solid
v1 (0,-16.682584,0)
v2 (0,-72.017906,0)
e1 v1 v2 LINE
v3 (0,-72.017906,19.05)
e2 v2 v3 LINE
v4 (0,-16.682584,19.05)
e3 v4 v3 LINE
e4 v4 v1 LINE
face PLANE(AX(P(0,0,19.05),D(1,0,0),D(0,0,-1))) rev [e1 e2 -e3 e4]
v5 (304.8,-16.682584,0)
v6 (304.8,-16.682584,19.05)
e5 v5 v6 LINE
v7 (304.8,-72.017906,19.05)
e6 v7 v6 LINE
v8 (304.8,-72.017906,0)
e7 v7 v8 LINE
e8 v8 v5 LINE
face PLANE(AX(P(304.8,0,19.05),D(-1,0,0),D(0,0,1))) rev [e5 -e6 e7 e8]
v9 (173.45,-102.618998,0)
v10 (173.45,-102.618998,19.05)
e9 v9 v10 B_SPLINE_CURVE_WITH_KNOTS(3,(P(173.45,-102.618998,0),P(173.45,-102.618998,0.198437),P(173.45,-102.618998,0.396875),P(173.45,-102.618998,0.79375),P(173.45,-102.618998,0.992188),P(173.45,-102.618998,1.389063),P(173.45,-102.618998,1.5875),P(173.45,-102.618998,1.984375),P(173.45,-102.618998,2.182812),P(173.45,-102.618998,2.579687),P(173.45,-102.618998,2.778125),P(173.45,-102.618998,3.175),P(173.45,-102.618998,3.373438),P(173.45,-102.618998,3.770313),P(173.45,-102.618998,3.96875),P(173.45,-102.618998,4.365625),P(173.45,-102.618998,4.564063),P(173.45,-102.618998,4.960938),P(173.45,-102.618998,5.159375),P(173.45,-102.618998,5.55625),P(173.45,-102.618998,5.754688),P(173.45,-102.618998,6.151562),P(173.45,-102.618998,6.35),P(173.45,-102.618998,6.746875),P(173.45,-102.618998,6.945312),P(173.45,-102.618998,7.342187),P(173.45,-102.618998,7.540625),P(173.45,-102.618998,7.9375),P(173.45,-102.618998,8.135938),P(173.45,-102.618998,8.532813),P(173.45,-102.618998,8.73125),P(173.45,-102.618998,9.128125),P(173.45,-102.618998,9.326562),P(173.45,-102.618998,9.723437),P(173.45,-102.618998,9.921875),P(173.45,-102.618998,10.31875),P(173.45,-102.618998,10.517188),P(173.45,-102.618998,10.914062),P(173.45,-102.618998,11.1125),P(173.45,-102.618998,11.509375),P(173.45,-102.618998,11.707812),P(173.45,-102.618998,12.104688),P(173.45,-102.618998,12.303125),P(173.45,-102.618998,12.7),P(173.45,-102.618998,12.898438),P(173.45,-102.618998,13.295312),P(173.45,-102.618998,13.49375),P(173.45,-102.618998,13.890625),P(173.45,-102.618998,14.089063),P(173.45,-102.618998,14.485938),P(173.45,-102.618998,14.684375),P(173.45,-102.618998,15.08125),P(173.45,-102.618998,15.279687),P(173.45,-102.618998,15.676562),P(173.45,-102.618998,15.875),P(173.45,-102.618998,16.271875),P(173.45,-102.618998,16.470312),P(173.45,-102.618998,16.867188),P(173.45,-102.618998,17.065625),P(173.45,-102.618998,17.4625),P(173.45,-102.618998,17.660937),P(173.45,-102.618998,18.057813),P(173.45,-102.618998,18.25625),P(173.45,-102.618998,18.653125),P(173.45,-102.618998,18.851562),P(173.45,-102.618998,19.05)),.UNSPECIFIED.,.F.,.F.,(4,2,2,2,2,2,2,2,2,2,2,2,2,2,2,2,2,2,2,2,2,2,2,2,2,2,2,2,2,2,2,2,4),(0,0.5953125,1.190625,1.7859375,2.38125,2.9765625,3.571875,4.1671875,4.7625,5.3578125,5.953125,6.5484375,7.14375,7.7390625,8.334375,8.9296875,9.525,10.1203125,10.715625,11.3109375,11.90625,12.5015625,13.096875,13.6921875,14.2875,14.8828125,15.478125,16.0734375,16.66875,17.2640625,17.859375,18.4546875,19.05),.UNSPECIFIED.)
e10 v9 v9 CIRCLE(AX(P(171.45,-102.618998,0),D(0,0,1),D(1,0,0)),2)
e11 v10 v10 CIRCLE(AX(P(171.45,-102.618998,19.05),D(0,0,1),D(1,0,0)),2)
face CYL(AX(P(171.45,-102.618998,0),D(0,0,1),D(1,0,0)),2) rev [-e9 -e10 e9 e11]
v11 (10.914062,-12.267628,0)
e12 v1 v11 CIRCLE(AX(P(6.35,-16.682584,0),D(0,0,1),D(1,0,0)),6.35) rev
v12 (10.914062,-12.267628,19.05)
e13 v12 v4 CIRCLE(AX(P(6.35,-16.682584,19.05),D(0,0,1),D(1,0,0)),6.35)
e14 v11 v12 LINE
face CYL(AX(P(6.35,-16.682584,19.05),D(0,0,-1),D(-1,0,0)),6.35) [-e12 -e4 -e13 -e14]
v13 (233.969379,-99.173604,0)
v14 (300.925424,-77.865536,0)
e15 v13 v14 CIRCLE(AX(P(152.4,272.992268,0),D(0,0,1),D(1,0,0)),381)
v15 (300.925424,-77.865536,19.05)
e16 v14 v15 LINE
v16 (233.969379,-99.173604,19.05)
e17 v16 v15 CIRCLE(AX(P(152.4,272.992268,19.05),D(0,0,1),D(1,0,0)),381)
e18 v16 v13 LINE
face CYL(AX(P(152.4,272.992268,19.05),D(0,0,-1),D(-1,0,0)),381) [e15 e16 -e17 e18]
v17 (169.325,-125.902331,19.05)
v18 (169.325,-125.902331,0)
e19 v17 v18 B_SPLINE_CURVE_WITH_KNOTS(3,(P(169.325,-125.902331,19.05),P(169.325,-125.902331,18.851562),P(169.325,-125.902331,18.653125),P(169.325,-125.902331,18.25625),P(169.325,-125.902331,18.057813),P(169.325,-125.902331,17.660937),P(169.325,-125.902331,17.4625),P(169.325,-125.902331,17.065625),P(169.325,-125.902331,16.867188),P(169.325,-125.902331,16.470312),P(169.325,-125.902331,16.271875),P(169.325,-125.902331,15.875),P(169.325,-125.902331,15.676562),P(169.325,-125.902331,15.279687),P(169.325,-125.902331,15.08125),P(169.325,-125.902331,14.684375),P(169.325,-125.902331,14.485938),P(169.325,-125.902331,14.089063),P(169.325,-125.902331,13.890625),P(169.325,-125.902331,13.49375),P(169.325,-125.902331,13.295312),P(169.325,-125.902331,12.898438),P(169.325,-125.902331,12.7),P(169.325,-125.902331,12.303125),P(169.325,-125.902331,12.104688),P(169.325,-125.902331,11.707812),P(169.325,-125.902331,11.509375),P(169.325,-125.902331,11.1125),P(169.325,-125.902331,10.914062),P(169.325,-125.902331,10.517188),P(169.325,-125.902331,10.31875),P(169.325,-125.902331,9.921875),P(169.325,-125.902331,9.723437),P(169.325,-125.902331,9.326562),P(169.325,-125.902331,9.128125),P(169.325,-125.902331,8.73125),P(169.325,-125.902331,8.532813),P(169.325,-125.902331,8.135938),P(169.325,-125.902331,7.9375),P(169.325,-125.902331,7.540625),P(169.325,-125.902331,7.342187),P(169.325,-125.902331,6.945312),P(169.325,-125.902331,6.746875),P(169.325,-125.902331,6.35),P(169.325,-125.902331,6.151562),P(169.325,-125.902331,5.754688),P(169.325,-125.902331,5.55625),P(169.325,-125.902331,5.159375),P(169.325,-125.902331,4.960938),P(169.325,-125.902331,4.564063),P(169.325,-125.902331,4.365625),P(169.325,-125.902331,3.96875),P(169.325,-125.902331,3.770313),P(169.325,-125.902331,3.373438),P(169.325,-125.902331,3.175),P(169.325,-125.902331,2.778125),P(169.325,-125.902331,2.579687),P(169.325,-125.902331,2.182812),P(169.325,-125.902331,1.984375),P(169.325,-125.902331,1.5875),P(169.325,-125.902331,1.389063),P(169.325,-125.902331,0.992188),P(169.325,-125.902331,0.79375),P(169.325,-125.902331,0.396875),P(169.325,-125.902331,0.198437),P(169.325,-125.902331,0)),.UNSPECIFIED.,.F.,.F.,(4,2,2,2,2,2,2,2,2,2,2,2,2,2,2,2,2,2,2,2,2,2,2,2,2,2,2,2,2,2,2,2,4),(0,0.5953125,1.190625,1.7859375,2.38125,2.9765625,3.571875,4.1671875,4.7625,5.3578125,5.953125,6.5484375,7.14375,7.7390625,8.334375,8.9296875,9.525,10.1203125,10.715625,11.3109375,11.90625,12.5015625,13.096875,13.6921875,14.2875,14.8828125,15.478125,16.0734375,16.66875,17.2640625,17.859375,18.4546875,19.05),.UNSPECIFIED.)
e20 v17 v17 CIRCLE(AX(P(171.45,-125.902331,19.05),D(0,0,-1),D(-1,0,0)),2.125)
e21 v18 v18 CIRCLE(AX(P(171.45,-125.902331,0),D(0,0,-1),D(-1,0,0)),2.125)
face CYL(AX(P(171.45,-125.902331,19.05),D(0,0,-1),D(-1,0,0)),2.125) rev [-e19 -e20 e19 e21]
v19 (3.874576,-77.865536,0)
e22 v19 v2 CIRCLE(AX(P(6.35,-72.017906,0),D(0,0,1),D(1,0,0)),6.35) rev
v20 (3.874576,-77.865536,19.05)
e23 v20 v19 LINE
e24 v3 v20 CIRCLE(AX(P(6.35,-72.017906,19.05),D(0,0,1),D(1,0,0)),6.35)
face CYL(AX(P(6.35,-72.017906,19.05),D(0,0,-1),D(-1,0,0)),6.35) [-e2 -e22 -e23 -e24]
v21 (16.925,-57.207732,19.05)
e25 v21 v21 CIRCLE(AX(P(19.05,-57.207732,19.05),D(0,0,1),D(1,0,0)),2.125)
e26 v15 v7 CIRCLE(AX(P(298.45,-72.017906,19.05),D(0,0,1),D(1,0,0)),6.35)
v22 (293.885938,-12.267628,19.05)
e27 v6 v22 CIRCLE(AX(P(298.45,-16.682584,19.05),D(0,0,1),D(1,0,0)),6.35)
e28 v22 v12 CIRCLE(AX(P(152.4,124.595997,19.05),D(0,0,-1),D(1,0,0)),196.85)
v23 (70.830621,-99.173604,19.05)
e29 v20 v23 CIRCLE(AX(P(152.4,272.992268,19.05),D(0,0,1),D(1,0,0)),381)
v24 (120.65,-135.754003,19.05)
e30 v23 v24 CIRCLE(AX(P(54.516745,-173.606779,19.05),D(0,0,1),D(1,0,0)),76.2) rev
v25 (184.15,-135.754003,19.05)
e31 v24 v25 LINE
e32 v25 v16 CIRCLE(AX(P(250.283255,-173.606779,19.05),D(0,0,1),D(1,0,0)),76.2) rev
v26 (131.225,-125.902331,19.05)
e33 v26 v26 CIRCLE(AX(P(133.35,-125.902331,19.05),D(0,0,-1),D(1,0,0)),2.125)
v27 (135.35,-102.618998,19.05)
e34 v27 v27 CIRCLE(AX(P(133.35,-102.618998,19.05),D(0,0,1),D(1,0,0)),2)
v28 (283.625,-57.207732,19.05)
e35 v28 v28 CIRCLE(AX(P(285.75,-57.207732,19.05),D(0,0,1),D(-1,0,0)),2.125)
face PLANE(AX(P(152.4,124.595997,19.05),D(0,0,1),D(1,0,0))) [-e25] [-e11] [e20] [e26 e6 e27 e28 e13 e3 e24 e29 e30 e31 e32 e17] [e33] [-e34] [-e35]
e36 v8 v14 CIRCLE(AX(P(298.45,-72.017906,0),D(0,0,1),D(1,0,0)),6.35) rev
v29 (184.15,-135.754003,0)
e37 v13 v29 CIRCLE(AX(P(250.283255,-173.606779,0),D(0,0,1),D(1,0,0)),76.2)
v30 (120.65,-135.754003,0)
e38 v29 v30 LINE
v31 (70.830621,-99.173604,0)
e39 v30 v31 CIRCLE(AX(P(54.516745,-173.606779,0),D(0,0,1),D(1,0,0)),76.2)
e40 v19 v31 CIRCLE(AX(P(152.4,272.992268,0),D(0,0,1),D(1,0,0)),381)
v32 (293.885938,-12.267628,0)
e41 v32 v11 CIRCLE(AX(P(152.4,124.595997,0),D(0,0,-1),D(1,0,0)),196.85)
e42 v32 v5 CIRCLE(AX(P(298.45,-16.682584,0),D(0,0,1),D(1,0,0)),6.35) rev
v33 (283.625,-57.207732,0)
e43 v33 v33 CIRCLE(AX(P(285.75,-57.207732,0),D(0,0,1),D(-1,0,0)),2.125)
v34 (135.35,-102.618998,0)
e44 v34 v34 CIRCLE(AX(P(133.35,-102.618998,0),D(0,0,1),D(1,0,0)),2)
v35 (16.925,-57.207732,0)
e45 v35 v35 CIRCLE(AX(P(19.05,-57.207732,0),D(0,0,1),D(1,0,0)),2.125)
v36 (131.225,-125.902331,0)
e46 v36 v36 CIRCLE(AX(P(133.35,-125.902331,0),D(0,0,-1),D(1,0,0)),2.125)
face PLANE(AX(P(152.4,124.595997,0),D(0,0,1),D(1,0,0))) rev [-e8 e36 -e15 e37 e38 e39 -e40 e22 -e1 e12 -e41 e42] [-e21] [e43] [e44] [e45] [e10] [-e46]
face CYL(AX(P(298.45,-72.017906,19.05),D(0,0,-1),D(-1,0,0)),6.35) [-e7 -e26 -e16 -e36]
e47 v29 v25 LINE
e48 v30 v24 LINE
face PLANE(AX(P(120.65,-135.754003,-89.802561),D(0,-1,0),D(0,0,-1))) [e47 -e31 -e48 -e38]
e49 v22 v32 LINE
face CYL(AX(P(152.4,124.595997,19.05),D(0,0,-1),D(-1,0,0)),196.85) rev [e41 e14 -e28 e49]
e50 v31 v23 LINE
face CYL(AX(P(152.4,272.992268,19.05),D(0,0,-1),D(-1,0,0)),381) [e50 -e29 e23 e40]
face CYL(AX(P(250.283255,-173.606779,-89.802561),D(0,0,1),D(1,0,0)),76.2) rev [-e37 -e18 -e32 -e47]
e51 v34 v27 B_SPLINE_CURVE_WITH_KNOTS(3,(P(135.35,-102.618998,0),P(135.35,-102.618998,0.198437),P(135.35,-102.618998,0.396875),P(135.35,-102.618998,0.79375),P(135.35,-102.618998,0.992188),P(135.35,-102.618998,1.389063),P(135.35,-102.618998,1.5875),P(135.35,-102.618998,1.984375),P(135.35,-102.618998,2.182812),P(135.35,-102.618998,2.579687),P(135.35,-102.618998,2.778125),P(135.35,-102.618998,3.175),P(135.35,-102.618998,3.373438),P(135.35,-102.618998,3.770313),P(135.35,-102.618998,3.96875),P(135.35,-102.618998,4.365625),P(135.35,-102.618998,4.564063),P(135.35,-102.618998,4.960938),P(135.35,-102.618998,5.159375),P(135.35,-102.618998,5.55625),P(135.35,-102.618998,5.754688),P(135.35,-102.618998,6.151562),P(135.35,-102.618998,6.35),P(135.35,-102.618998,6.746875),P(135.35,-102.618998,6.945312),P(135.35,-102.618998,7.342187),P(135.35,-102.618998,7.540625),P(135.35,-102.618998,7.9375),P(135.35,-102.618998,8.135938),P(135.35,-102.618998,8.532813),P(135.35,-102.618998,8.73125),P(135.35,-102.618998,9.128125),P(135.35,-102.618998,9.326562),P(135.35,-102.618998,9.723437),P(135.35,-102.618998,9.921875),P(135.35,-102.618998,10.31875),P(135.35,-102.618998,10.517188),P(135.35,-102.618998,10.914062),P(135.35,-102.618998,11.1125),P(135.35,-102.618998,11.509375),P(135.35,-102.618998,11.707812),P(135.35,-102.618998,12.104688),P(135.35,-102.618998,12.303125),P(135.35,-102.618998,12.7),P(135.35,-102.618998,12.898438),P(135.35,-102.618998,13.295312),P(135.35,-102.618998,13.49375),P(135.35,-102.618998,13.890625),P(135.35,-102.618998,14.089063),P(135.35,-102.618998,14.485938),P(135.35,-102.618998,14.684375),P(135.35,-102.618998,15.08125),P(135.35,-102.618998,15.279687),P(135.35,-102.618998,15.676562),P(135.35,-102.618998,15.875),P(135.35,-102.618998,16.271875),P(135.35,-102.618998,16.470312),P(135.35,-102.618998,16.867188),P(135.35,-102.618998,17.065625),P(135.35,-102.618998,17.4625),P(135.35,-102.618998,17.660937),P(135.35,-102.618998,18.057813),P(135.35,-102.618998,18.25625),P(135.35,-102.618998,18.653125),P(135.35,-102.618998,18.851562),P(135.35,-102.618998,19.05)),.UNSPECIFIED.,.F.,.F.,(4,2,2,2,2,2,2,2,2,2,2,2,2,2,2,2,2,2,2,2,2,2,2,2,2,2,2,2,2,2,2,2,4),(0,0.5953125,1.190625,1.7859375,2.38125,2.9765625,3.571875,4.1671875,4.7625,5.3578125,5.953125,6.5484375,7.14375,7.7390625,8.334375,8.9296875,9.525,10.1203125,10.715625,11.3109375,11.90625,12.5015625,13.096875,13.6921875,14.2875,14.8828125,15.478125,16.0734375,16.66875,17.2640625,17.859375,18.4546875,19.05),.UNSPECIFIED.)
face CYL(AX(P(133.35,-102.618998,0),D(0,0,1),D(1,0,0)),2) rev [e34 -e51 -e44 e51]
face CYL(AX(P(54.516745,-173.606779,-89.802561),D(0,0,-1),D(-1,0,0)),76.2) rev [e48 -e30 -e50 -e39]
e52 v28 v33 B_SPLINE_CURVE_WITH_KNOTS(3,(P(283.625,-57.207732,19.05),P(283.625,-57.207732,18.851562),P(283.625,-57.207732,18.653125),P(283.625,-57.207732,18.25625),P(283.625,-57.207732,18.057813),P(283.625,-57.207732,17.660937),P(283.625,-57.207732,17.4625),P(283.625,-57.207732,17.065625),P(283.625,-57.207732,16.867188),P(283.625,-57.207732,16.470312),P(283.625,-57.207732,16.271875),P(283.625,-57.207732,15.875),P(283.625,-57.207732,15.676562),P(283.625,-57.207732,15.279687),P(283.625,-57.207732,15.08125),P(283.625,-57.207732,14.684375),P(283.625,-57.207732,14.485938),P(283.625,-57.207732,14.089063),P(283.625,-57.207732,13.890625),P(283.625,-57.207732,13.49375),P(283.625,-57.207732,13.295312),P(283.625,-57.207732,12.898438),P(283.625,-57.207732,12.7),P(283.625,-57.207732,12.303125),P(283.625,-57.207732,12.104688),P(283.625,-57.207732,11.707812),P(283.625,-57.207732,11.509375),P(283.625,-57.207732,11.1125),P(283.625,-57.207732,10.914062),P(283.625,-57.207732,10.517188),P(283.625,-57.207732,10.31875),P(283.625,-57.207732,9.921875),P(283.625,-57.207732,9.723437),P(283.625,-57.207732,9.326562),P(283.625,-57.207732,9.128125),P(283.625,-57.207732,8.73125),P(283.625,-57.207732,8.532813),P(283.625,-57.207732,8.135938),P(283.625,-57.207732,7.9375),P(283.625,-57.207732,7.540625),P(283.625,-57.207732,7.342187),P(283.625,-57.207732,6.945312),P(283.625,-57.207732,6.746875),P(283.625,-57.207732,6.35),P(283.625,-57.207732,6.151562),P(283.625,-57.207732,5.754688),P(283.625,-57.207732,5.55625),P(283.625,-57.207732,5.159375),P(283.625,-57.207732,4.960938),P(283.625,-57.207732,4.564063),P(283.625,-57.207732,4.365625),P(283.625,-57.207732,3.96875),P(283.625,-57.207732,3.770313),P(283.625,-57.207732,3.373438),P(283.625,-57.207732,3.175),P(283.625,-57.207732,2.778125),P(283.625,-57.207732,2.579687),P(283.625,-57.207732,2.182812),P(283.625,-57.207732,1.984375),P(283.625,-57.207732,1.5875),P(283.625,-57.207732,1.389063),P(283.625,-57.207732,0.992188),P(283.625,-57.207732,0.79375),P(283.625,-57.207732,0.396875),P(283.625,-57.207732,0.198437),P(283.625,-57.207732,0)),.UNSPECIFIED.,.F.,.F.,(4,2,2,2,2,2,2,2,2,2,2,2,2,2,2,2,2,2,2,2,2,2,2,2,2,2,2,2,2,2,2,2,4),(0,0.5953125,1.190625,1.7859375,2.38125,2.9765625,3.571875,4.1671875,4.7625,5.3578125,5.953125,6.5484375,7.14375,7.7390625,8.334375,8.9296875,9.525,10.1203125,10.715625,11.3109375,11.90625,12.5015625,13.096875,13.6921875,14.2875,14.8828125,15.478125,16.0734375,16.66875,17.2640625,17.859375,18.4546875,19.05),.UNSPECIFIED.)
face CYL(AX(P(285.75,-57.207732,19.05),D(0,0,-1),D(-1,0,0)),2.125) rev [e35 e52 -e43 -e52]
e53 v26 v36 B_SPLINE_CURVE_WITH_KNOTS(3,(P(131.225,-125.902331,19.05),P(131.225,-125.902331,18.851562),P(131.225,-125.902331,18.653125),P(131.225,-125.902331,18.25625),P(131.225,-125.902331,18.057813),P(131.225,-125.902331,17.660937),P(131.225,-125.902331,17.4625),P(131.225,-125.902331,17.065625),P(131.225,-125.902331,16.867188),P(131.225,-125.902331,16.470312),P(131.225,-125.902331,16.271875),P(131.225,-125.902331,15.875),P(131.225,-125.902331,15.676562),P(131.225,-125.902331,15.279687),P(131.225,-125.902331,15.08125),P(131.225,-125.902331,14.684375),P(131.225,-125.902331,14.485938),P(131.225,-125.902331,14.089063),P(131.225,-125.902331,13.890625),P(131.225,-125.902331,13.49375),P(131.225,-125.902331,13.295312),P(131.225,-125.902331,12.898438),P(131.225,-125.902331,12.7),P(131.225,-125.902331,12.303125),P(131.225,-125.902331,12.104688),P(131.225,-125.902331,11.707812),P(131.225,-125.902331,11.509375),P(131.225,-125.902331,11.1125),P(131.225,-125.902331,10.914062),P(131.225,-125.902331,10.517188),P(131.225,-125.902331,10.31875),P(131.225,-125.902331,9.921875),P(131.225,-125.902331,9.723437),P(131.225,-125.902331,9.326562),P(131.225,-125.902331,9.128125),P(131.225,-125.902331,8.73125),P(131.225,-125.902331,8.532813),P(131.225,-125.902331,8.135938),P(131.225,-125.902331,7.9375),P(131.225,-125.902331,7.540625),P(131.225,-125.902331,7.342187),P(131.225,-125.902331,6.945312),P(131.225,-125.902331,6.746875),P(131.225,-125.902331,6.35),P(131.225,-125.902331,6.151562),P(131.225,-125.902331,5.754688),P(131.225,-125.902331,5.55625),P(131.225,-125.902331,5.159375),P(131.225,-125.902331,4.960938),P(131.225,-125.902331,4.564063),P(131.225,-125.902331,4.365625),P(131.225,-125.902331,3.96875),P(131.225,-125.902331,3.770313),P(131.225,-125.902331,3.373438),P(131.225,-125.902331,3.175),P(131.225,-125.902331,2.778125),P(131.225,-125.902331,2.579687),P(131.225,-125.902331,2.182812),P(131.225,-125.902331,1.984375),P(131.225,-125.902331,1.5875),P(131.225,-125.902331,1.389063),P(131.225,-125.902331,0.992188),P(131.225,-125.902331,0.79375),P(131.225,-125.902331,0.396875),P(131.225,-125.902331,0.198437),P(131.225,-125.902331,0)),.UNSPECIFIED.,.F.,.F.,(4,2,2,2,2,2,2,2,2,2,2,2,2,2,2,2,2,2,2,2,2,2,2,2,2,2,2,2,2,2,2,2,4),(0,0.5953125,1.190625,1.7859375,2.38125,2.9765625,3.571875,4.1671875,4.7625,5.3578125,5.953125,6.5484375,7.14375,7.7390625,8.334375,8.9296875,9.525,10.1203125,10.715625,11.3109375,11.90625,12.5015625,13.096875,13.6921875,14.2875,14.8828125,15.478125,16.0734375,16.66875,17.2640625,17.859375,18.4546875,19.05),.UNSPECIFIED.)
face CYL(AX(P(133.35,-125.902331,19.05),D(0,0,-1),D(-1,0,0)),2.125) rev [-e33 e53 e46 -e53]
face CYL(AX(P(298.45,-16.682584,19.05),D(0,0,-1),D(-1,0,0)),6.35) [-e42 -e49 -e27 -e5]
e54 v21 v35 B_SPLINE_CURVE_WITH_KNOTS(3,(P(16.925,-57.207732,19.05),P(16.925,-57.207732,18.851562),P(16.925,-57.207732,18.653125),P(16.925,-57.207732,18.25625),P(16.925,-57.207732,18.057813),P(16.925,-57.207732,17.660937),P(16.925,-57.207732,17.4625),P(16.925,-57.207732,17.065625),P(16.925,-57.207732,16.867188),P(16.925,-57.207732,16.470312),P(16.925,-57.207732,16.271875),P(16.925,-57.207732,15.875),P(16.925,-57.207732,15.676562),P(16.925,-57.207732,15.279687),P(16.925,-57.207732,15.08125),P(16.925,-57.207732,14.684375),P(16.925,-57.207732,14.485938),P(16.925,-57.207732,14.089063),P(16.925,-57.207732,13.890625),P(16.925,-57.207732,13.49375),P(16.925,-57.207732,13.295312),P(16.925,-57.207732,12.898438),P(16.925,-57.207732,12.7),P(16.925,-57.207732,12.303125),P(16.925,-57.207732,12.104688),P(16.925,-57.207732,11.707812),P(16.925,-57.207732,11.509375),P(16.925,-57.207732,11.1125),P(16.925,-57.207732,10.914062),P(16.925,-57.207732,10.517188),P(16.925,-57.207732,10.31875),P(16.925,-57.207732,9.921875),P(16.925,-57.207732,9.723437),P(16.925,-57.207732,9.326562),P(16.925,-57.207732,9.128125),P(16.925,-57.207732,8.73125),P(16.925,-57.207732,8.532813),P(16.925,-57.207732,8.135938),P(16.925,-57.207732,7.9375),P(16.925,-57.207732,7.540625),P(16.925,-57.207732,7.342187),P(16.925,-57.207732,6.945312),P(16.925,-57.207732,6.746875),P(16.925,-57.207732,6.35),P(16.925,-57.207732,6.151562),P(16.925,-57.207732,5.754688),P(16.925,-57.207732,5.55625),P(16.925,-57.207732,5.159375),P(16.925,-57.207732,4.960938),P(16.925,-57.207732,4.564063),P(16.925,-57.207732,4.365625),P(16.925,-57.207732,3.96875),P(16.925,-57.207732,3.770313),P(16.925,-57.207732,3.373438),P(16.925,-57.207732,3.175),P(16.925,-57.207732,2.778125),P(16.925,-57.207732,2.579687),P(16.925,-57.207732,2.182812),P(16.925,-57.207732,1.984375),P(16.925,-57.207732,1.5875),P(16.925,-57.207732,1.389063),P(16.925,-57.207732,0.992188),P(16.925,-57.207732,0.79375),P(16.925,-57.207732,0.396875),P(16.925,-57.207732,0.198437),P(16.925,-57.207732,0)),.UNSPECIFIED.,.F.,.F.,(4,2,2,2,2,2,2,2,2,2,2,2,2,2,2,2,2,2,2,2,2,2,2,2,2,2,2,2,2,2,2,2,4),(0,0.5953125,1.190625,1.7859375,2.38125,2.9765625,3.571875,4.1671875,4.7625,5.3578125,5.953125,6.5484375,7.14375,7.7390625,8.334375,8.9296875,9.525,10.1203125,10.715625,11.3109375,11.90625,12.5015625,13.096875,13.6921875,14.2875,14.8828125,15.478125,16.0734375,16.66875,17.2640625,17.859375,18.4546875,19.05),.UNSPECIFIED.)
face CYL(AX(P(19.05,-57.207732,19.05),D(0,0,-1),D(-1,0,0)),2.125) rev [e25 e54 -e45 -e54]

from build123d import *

# Parameters (mm, degrees)
SKETCH1_R           = 2.125
BOSS_EXTRUDE1_DEPTH = 19.05
FILLET1_R           = 6.35
FILLET2_R           = 6.35
SKETCH3_W           = 63.5
SKETCH3_H           = 63.5
BOSS_EXTRUDE2_DEPTH = 19.05
FILLET3_R           = 76.2
SKETCH8_R           = 2.125
CUT_EXTRUDE3_DEPTH  = 19.05
SKETCH10_R          = 2
CUT_EXTRUDE7_DEPTH  = 335.208156388


with BuildPart() as part:
    # Sketch1 → Boss-Extrude1 (new body)
    with BuildSketch(Plane.XY):
        with BuildLine():
            Line((0, 0), (0, -76.2))
            ThreePointArc((0, -76.2), (152.4, -108.007732044), (304.8, -76.2))
            Line((304.8, -76.2), (304.8, 0))
            ThreePointArc((304.8, 0), (152.4, -72.254002873), (0, 0))
        make_face()
        with Locations(Location((19.05, -57.207732044, 0), (0, 0, 180))):
            Circle(SKETCH1_R, mode=Mode.SUBTRACT)
        with Locations(Location((285.75, -57.207732044, 0), (0, 0, 180))):
            Circle(SKETCH1_R, mode=Mode.SUBTRACT)
    extrude(amount=BOSS_EXTRUDE1_DEPTH)

    # Fillet1
    fillet1_edges = [part.edges().sort_by_distance(p)[0] for p in [
        (304.8, 0, 9.525),
        (0, 0, 9.525),
    ]]
    fillet(fillet1_edges, radius=FILLET1_R)

    # Fillet2
    fillet2_edges = [part.edges().sort_by_distance(p)[0] for p in [
        (304.8, -76.2, 9.525),
        (0, -76.2, 9.525),
    ]]
    fillet(fillet2_edges, radius=FILLET2_R)

    # Sketch3 → Boss-Extrude2 (add)
    with BuildSketch(Plane.XY.offset(19.05)):
        with Locations((152.4, -104.004002873)):
            Rectangle(SKETCH3_W, SKETCH3_H)
    extrude(amount=-BOSS_EXTRUDE2_DEPTH)

    # Fillet3
    # the kernel refuses this fillet: 76.2 mm, written as the material it adds along each edge
    with BuildSketch(Plane(origin=(184.15, -106.682510638, 19.05), x_dir=(0.9888312847973341, 0.1490392237166227, 0), z_dir=(0, 0, -1))) as fillet3_piece_1:
        with BuildLine():
            CenterArc((55.420290143, 76.033258895), FILLET3_R, 218.356834864, 47.852104701)
            Line((-4.332792635, 28.746801018), (-5.527854291, 27.801071861))
            ThreePointArc((-5.527854291, 27.801071861), (-3.673375196, 14.146264732), (-1.506978878, -0.227135777))
            Line((-1.506978878, -0.227135777), (0.100764164, -1.520665178))
            ThreePointArc((0.100764164, -1.520665178), (25.191040974, -0.690294475), (50.281317784, -1.520665178))
            Line((50.281317784, -1.520665178), (50.382081948, 0))
        make_face()
    extrude(amount=19.05)
    with BuildSketch(Plane(origin=(120.65, -106.682510638, 19.05), x_dir=(0, -1, 0), z_dir=(0, 0, -1))) as fillet3_piece_2:
        with BuildLine():
            CenterArc((66.924268059, 66.133254588), FILLET3_R, 192.362312718, 47.852104701)
            Line((-7.508906383, 49.819378823), (-8.997569872, 49.493101308))
            ThreePointArc((-8.997569872, 49.493101308), (-4.437037964, 24.806808459), (-1.518699114, -0.127))
            Line((-1.518699114, -0.127), (0, -1.524))
            ThreePointArc((0, -1.524), (14.535746118, -1.524), (28.314436719, -1.322665092))
            Line((28.314436719, -1.322665092), (29.071492235, 0))
        make_face()
    extrude(amount=19.05)

    # Sketch8 → Cut-Extrude3 (cut)
    with BuildSketch(Plane(origin=(0, 0, 0), x_dir=(-1, 0, 0), z_dir=(0, 0, -1))):
        with Locations((-171.45, -125.902330937)):
            Circle(SKETCH8_R)
        with Locations((-133.35, -125.902330937)):
            Circle(SKETCH8_R)
    extrude(amount=-CUT_EXTRUDE3_DEPTH, mode=Mode.SUBTRACT)

    # Sketch10 → Cut-Extrude7 (cut, through all)
    with BuildSketch(Plane.XY.offset(19.05)):
        with Locations((133.35, -102.618997603)):
            Circle(SKETCH10_R)
        with Locations((171.45, -102.618997603)):
            Circle(SKETCH10_R)
    extrude(amount=-CUT_EXTRUDE7_DEPTH, mode=Mode.SUBTRACT)


solid = part.part
